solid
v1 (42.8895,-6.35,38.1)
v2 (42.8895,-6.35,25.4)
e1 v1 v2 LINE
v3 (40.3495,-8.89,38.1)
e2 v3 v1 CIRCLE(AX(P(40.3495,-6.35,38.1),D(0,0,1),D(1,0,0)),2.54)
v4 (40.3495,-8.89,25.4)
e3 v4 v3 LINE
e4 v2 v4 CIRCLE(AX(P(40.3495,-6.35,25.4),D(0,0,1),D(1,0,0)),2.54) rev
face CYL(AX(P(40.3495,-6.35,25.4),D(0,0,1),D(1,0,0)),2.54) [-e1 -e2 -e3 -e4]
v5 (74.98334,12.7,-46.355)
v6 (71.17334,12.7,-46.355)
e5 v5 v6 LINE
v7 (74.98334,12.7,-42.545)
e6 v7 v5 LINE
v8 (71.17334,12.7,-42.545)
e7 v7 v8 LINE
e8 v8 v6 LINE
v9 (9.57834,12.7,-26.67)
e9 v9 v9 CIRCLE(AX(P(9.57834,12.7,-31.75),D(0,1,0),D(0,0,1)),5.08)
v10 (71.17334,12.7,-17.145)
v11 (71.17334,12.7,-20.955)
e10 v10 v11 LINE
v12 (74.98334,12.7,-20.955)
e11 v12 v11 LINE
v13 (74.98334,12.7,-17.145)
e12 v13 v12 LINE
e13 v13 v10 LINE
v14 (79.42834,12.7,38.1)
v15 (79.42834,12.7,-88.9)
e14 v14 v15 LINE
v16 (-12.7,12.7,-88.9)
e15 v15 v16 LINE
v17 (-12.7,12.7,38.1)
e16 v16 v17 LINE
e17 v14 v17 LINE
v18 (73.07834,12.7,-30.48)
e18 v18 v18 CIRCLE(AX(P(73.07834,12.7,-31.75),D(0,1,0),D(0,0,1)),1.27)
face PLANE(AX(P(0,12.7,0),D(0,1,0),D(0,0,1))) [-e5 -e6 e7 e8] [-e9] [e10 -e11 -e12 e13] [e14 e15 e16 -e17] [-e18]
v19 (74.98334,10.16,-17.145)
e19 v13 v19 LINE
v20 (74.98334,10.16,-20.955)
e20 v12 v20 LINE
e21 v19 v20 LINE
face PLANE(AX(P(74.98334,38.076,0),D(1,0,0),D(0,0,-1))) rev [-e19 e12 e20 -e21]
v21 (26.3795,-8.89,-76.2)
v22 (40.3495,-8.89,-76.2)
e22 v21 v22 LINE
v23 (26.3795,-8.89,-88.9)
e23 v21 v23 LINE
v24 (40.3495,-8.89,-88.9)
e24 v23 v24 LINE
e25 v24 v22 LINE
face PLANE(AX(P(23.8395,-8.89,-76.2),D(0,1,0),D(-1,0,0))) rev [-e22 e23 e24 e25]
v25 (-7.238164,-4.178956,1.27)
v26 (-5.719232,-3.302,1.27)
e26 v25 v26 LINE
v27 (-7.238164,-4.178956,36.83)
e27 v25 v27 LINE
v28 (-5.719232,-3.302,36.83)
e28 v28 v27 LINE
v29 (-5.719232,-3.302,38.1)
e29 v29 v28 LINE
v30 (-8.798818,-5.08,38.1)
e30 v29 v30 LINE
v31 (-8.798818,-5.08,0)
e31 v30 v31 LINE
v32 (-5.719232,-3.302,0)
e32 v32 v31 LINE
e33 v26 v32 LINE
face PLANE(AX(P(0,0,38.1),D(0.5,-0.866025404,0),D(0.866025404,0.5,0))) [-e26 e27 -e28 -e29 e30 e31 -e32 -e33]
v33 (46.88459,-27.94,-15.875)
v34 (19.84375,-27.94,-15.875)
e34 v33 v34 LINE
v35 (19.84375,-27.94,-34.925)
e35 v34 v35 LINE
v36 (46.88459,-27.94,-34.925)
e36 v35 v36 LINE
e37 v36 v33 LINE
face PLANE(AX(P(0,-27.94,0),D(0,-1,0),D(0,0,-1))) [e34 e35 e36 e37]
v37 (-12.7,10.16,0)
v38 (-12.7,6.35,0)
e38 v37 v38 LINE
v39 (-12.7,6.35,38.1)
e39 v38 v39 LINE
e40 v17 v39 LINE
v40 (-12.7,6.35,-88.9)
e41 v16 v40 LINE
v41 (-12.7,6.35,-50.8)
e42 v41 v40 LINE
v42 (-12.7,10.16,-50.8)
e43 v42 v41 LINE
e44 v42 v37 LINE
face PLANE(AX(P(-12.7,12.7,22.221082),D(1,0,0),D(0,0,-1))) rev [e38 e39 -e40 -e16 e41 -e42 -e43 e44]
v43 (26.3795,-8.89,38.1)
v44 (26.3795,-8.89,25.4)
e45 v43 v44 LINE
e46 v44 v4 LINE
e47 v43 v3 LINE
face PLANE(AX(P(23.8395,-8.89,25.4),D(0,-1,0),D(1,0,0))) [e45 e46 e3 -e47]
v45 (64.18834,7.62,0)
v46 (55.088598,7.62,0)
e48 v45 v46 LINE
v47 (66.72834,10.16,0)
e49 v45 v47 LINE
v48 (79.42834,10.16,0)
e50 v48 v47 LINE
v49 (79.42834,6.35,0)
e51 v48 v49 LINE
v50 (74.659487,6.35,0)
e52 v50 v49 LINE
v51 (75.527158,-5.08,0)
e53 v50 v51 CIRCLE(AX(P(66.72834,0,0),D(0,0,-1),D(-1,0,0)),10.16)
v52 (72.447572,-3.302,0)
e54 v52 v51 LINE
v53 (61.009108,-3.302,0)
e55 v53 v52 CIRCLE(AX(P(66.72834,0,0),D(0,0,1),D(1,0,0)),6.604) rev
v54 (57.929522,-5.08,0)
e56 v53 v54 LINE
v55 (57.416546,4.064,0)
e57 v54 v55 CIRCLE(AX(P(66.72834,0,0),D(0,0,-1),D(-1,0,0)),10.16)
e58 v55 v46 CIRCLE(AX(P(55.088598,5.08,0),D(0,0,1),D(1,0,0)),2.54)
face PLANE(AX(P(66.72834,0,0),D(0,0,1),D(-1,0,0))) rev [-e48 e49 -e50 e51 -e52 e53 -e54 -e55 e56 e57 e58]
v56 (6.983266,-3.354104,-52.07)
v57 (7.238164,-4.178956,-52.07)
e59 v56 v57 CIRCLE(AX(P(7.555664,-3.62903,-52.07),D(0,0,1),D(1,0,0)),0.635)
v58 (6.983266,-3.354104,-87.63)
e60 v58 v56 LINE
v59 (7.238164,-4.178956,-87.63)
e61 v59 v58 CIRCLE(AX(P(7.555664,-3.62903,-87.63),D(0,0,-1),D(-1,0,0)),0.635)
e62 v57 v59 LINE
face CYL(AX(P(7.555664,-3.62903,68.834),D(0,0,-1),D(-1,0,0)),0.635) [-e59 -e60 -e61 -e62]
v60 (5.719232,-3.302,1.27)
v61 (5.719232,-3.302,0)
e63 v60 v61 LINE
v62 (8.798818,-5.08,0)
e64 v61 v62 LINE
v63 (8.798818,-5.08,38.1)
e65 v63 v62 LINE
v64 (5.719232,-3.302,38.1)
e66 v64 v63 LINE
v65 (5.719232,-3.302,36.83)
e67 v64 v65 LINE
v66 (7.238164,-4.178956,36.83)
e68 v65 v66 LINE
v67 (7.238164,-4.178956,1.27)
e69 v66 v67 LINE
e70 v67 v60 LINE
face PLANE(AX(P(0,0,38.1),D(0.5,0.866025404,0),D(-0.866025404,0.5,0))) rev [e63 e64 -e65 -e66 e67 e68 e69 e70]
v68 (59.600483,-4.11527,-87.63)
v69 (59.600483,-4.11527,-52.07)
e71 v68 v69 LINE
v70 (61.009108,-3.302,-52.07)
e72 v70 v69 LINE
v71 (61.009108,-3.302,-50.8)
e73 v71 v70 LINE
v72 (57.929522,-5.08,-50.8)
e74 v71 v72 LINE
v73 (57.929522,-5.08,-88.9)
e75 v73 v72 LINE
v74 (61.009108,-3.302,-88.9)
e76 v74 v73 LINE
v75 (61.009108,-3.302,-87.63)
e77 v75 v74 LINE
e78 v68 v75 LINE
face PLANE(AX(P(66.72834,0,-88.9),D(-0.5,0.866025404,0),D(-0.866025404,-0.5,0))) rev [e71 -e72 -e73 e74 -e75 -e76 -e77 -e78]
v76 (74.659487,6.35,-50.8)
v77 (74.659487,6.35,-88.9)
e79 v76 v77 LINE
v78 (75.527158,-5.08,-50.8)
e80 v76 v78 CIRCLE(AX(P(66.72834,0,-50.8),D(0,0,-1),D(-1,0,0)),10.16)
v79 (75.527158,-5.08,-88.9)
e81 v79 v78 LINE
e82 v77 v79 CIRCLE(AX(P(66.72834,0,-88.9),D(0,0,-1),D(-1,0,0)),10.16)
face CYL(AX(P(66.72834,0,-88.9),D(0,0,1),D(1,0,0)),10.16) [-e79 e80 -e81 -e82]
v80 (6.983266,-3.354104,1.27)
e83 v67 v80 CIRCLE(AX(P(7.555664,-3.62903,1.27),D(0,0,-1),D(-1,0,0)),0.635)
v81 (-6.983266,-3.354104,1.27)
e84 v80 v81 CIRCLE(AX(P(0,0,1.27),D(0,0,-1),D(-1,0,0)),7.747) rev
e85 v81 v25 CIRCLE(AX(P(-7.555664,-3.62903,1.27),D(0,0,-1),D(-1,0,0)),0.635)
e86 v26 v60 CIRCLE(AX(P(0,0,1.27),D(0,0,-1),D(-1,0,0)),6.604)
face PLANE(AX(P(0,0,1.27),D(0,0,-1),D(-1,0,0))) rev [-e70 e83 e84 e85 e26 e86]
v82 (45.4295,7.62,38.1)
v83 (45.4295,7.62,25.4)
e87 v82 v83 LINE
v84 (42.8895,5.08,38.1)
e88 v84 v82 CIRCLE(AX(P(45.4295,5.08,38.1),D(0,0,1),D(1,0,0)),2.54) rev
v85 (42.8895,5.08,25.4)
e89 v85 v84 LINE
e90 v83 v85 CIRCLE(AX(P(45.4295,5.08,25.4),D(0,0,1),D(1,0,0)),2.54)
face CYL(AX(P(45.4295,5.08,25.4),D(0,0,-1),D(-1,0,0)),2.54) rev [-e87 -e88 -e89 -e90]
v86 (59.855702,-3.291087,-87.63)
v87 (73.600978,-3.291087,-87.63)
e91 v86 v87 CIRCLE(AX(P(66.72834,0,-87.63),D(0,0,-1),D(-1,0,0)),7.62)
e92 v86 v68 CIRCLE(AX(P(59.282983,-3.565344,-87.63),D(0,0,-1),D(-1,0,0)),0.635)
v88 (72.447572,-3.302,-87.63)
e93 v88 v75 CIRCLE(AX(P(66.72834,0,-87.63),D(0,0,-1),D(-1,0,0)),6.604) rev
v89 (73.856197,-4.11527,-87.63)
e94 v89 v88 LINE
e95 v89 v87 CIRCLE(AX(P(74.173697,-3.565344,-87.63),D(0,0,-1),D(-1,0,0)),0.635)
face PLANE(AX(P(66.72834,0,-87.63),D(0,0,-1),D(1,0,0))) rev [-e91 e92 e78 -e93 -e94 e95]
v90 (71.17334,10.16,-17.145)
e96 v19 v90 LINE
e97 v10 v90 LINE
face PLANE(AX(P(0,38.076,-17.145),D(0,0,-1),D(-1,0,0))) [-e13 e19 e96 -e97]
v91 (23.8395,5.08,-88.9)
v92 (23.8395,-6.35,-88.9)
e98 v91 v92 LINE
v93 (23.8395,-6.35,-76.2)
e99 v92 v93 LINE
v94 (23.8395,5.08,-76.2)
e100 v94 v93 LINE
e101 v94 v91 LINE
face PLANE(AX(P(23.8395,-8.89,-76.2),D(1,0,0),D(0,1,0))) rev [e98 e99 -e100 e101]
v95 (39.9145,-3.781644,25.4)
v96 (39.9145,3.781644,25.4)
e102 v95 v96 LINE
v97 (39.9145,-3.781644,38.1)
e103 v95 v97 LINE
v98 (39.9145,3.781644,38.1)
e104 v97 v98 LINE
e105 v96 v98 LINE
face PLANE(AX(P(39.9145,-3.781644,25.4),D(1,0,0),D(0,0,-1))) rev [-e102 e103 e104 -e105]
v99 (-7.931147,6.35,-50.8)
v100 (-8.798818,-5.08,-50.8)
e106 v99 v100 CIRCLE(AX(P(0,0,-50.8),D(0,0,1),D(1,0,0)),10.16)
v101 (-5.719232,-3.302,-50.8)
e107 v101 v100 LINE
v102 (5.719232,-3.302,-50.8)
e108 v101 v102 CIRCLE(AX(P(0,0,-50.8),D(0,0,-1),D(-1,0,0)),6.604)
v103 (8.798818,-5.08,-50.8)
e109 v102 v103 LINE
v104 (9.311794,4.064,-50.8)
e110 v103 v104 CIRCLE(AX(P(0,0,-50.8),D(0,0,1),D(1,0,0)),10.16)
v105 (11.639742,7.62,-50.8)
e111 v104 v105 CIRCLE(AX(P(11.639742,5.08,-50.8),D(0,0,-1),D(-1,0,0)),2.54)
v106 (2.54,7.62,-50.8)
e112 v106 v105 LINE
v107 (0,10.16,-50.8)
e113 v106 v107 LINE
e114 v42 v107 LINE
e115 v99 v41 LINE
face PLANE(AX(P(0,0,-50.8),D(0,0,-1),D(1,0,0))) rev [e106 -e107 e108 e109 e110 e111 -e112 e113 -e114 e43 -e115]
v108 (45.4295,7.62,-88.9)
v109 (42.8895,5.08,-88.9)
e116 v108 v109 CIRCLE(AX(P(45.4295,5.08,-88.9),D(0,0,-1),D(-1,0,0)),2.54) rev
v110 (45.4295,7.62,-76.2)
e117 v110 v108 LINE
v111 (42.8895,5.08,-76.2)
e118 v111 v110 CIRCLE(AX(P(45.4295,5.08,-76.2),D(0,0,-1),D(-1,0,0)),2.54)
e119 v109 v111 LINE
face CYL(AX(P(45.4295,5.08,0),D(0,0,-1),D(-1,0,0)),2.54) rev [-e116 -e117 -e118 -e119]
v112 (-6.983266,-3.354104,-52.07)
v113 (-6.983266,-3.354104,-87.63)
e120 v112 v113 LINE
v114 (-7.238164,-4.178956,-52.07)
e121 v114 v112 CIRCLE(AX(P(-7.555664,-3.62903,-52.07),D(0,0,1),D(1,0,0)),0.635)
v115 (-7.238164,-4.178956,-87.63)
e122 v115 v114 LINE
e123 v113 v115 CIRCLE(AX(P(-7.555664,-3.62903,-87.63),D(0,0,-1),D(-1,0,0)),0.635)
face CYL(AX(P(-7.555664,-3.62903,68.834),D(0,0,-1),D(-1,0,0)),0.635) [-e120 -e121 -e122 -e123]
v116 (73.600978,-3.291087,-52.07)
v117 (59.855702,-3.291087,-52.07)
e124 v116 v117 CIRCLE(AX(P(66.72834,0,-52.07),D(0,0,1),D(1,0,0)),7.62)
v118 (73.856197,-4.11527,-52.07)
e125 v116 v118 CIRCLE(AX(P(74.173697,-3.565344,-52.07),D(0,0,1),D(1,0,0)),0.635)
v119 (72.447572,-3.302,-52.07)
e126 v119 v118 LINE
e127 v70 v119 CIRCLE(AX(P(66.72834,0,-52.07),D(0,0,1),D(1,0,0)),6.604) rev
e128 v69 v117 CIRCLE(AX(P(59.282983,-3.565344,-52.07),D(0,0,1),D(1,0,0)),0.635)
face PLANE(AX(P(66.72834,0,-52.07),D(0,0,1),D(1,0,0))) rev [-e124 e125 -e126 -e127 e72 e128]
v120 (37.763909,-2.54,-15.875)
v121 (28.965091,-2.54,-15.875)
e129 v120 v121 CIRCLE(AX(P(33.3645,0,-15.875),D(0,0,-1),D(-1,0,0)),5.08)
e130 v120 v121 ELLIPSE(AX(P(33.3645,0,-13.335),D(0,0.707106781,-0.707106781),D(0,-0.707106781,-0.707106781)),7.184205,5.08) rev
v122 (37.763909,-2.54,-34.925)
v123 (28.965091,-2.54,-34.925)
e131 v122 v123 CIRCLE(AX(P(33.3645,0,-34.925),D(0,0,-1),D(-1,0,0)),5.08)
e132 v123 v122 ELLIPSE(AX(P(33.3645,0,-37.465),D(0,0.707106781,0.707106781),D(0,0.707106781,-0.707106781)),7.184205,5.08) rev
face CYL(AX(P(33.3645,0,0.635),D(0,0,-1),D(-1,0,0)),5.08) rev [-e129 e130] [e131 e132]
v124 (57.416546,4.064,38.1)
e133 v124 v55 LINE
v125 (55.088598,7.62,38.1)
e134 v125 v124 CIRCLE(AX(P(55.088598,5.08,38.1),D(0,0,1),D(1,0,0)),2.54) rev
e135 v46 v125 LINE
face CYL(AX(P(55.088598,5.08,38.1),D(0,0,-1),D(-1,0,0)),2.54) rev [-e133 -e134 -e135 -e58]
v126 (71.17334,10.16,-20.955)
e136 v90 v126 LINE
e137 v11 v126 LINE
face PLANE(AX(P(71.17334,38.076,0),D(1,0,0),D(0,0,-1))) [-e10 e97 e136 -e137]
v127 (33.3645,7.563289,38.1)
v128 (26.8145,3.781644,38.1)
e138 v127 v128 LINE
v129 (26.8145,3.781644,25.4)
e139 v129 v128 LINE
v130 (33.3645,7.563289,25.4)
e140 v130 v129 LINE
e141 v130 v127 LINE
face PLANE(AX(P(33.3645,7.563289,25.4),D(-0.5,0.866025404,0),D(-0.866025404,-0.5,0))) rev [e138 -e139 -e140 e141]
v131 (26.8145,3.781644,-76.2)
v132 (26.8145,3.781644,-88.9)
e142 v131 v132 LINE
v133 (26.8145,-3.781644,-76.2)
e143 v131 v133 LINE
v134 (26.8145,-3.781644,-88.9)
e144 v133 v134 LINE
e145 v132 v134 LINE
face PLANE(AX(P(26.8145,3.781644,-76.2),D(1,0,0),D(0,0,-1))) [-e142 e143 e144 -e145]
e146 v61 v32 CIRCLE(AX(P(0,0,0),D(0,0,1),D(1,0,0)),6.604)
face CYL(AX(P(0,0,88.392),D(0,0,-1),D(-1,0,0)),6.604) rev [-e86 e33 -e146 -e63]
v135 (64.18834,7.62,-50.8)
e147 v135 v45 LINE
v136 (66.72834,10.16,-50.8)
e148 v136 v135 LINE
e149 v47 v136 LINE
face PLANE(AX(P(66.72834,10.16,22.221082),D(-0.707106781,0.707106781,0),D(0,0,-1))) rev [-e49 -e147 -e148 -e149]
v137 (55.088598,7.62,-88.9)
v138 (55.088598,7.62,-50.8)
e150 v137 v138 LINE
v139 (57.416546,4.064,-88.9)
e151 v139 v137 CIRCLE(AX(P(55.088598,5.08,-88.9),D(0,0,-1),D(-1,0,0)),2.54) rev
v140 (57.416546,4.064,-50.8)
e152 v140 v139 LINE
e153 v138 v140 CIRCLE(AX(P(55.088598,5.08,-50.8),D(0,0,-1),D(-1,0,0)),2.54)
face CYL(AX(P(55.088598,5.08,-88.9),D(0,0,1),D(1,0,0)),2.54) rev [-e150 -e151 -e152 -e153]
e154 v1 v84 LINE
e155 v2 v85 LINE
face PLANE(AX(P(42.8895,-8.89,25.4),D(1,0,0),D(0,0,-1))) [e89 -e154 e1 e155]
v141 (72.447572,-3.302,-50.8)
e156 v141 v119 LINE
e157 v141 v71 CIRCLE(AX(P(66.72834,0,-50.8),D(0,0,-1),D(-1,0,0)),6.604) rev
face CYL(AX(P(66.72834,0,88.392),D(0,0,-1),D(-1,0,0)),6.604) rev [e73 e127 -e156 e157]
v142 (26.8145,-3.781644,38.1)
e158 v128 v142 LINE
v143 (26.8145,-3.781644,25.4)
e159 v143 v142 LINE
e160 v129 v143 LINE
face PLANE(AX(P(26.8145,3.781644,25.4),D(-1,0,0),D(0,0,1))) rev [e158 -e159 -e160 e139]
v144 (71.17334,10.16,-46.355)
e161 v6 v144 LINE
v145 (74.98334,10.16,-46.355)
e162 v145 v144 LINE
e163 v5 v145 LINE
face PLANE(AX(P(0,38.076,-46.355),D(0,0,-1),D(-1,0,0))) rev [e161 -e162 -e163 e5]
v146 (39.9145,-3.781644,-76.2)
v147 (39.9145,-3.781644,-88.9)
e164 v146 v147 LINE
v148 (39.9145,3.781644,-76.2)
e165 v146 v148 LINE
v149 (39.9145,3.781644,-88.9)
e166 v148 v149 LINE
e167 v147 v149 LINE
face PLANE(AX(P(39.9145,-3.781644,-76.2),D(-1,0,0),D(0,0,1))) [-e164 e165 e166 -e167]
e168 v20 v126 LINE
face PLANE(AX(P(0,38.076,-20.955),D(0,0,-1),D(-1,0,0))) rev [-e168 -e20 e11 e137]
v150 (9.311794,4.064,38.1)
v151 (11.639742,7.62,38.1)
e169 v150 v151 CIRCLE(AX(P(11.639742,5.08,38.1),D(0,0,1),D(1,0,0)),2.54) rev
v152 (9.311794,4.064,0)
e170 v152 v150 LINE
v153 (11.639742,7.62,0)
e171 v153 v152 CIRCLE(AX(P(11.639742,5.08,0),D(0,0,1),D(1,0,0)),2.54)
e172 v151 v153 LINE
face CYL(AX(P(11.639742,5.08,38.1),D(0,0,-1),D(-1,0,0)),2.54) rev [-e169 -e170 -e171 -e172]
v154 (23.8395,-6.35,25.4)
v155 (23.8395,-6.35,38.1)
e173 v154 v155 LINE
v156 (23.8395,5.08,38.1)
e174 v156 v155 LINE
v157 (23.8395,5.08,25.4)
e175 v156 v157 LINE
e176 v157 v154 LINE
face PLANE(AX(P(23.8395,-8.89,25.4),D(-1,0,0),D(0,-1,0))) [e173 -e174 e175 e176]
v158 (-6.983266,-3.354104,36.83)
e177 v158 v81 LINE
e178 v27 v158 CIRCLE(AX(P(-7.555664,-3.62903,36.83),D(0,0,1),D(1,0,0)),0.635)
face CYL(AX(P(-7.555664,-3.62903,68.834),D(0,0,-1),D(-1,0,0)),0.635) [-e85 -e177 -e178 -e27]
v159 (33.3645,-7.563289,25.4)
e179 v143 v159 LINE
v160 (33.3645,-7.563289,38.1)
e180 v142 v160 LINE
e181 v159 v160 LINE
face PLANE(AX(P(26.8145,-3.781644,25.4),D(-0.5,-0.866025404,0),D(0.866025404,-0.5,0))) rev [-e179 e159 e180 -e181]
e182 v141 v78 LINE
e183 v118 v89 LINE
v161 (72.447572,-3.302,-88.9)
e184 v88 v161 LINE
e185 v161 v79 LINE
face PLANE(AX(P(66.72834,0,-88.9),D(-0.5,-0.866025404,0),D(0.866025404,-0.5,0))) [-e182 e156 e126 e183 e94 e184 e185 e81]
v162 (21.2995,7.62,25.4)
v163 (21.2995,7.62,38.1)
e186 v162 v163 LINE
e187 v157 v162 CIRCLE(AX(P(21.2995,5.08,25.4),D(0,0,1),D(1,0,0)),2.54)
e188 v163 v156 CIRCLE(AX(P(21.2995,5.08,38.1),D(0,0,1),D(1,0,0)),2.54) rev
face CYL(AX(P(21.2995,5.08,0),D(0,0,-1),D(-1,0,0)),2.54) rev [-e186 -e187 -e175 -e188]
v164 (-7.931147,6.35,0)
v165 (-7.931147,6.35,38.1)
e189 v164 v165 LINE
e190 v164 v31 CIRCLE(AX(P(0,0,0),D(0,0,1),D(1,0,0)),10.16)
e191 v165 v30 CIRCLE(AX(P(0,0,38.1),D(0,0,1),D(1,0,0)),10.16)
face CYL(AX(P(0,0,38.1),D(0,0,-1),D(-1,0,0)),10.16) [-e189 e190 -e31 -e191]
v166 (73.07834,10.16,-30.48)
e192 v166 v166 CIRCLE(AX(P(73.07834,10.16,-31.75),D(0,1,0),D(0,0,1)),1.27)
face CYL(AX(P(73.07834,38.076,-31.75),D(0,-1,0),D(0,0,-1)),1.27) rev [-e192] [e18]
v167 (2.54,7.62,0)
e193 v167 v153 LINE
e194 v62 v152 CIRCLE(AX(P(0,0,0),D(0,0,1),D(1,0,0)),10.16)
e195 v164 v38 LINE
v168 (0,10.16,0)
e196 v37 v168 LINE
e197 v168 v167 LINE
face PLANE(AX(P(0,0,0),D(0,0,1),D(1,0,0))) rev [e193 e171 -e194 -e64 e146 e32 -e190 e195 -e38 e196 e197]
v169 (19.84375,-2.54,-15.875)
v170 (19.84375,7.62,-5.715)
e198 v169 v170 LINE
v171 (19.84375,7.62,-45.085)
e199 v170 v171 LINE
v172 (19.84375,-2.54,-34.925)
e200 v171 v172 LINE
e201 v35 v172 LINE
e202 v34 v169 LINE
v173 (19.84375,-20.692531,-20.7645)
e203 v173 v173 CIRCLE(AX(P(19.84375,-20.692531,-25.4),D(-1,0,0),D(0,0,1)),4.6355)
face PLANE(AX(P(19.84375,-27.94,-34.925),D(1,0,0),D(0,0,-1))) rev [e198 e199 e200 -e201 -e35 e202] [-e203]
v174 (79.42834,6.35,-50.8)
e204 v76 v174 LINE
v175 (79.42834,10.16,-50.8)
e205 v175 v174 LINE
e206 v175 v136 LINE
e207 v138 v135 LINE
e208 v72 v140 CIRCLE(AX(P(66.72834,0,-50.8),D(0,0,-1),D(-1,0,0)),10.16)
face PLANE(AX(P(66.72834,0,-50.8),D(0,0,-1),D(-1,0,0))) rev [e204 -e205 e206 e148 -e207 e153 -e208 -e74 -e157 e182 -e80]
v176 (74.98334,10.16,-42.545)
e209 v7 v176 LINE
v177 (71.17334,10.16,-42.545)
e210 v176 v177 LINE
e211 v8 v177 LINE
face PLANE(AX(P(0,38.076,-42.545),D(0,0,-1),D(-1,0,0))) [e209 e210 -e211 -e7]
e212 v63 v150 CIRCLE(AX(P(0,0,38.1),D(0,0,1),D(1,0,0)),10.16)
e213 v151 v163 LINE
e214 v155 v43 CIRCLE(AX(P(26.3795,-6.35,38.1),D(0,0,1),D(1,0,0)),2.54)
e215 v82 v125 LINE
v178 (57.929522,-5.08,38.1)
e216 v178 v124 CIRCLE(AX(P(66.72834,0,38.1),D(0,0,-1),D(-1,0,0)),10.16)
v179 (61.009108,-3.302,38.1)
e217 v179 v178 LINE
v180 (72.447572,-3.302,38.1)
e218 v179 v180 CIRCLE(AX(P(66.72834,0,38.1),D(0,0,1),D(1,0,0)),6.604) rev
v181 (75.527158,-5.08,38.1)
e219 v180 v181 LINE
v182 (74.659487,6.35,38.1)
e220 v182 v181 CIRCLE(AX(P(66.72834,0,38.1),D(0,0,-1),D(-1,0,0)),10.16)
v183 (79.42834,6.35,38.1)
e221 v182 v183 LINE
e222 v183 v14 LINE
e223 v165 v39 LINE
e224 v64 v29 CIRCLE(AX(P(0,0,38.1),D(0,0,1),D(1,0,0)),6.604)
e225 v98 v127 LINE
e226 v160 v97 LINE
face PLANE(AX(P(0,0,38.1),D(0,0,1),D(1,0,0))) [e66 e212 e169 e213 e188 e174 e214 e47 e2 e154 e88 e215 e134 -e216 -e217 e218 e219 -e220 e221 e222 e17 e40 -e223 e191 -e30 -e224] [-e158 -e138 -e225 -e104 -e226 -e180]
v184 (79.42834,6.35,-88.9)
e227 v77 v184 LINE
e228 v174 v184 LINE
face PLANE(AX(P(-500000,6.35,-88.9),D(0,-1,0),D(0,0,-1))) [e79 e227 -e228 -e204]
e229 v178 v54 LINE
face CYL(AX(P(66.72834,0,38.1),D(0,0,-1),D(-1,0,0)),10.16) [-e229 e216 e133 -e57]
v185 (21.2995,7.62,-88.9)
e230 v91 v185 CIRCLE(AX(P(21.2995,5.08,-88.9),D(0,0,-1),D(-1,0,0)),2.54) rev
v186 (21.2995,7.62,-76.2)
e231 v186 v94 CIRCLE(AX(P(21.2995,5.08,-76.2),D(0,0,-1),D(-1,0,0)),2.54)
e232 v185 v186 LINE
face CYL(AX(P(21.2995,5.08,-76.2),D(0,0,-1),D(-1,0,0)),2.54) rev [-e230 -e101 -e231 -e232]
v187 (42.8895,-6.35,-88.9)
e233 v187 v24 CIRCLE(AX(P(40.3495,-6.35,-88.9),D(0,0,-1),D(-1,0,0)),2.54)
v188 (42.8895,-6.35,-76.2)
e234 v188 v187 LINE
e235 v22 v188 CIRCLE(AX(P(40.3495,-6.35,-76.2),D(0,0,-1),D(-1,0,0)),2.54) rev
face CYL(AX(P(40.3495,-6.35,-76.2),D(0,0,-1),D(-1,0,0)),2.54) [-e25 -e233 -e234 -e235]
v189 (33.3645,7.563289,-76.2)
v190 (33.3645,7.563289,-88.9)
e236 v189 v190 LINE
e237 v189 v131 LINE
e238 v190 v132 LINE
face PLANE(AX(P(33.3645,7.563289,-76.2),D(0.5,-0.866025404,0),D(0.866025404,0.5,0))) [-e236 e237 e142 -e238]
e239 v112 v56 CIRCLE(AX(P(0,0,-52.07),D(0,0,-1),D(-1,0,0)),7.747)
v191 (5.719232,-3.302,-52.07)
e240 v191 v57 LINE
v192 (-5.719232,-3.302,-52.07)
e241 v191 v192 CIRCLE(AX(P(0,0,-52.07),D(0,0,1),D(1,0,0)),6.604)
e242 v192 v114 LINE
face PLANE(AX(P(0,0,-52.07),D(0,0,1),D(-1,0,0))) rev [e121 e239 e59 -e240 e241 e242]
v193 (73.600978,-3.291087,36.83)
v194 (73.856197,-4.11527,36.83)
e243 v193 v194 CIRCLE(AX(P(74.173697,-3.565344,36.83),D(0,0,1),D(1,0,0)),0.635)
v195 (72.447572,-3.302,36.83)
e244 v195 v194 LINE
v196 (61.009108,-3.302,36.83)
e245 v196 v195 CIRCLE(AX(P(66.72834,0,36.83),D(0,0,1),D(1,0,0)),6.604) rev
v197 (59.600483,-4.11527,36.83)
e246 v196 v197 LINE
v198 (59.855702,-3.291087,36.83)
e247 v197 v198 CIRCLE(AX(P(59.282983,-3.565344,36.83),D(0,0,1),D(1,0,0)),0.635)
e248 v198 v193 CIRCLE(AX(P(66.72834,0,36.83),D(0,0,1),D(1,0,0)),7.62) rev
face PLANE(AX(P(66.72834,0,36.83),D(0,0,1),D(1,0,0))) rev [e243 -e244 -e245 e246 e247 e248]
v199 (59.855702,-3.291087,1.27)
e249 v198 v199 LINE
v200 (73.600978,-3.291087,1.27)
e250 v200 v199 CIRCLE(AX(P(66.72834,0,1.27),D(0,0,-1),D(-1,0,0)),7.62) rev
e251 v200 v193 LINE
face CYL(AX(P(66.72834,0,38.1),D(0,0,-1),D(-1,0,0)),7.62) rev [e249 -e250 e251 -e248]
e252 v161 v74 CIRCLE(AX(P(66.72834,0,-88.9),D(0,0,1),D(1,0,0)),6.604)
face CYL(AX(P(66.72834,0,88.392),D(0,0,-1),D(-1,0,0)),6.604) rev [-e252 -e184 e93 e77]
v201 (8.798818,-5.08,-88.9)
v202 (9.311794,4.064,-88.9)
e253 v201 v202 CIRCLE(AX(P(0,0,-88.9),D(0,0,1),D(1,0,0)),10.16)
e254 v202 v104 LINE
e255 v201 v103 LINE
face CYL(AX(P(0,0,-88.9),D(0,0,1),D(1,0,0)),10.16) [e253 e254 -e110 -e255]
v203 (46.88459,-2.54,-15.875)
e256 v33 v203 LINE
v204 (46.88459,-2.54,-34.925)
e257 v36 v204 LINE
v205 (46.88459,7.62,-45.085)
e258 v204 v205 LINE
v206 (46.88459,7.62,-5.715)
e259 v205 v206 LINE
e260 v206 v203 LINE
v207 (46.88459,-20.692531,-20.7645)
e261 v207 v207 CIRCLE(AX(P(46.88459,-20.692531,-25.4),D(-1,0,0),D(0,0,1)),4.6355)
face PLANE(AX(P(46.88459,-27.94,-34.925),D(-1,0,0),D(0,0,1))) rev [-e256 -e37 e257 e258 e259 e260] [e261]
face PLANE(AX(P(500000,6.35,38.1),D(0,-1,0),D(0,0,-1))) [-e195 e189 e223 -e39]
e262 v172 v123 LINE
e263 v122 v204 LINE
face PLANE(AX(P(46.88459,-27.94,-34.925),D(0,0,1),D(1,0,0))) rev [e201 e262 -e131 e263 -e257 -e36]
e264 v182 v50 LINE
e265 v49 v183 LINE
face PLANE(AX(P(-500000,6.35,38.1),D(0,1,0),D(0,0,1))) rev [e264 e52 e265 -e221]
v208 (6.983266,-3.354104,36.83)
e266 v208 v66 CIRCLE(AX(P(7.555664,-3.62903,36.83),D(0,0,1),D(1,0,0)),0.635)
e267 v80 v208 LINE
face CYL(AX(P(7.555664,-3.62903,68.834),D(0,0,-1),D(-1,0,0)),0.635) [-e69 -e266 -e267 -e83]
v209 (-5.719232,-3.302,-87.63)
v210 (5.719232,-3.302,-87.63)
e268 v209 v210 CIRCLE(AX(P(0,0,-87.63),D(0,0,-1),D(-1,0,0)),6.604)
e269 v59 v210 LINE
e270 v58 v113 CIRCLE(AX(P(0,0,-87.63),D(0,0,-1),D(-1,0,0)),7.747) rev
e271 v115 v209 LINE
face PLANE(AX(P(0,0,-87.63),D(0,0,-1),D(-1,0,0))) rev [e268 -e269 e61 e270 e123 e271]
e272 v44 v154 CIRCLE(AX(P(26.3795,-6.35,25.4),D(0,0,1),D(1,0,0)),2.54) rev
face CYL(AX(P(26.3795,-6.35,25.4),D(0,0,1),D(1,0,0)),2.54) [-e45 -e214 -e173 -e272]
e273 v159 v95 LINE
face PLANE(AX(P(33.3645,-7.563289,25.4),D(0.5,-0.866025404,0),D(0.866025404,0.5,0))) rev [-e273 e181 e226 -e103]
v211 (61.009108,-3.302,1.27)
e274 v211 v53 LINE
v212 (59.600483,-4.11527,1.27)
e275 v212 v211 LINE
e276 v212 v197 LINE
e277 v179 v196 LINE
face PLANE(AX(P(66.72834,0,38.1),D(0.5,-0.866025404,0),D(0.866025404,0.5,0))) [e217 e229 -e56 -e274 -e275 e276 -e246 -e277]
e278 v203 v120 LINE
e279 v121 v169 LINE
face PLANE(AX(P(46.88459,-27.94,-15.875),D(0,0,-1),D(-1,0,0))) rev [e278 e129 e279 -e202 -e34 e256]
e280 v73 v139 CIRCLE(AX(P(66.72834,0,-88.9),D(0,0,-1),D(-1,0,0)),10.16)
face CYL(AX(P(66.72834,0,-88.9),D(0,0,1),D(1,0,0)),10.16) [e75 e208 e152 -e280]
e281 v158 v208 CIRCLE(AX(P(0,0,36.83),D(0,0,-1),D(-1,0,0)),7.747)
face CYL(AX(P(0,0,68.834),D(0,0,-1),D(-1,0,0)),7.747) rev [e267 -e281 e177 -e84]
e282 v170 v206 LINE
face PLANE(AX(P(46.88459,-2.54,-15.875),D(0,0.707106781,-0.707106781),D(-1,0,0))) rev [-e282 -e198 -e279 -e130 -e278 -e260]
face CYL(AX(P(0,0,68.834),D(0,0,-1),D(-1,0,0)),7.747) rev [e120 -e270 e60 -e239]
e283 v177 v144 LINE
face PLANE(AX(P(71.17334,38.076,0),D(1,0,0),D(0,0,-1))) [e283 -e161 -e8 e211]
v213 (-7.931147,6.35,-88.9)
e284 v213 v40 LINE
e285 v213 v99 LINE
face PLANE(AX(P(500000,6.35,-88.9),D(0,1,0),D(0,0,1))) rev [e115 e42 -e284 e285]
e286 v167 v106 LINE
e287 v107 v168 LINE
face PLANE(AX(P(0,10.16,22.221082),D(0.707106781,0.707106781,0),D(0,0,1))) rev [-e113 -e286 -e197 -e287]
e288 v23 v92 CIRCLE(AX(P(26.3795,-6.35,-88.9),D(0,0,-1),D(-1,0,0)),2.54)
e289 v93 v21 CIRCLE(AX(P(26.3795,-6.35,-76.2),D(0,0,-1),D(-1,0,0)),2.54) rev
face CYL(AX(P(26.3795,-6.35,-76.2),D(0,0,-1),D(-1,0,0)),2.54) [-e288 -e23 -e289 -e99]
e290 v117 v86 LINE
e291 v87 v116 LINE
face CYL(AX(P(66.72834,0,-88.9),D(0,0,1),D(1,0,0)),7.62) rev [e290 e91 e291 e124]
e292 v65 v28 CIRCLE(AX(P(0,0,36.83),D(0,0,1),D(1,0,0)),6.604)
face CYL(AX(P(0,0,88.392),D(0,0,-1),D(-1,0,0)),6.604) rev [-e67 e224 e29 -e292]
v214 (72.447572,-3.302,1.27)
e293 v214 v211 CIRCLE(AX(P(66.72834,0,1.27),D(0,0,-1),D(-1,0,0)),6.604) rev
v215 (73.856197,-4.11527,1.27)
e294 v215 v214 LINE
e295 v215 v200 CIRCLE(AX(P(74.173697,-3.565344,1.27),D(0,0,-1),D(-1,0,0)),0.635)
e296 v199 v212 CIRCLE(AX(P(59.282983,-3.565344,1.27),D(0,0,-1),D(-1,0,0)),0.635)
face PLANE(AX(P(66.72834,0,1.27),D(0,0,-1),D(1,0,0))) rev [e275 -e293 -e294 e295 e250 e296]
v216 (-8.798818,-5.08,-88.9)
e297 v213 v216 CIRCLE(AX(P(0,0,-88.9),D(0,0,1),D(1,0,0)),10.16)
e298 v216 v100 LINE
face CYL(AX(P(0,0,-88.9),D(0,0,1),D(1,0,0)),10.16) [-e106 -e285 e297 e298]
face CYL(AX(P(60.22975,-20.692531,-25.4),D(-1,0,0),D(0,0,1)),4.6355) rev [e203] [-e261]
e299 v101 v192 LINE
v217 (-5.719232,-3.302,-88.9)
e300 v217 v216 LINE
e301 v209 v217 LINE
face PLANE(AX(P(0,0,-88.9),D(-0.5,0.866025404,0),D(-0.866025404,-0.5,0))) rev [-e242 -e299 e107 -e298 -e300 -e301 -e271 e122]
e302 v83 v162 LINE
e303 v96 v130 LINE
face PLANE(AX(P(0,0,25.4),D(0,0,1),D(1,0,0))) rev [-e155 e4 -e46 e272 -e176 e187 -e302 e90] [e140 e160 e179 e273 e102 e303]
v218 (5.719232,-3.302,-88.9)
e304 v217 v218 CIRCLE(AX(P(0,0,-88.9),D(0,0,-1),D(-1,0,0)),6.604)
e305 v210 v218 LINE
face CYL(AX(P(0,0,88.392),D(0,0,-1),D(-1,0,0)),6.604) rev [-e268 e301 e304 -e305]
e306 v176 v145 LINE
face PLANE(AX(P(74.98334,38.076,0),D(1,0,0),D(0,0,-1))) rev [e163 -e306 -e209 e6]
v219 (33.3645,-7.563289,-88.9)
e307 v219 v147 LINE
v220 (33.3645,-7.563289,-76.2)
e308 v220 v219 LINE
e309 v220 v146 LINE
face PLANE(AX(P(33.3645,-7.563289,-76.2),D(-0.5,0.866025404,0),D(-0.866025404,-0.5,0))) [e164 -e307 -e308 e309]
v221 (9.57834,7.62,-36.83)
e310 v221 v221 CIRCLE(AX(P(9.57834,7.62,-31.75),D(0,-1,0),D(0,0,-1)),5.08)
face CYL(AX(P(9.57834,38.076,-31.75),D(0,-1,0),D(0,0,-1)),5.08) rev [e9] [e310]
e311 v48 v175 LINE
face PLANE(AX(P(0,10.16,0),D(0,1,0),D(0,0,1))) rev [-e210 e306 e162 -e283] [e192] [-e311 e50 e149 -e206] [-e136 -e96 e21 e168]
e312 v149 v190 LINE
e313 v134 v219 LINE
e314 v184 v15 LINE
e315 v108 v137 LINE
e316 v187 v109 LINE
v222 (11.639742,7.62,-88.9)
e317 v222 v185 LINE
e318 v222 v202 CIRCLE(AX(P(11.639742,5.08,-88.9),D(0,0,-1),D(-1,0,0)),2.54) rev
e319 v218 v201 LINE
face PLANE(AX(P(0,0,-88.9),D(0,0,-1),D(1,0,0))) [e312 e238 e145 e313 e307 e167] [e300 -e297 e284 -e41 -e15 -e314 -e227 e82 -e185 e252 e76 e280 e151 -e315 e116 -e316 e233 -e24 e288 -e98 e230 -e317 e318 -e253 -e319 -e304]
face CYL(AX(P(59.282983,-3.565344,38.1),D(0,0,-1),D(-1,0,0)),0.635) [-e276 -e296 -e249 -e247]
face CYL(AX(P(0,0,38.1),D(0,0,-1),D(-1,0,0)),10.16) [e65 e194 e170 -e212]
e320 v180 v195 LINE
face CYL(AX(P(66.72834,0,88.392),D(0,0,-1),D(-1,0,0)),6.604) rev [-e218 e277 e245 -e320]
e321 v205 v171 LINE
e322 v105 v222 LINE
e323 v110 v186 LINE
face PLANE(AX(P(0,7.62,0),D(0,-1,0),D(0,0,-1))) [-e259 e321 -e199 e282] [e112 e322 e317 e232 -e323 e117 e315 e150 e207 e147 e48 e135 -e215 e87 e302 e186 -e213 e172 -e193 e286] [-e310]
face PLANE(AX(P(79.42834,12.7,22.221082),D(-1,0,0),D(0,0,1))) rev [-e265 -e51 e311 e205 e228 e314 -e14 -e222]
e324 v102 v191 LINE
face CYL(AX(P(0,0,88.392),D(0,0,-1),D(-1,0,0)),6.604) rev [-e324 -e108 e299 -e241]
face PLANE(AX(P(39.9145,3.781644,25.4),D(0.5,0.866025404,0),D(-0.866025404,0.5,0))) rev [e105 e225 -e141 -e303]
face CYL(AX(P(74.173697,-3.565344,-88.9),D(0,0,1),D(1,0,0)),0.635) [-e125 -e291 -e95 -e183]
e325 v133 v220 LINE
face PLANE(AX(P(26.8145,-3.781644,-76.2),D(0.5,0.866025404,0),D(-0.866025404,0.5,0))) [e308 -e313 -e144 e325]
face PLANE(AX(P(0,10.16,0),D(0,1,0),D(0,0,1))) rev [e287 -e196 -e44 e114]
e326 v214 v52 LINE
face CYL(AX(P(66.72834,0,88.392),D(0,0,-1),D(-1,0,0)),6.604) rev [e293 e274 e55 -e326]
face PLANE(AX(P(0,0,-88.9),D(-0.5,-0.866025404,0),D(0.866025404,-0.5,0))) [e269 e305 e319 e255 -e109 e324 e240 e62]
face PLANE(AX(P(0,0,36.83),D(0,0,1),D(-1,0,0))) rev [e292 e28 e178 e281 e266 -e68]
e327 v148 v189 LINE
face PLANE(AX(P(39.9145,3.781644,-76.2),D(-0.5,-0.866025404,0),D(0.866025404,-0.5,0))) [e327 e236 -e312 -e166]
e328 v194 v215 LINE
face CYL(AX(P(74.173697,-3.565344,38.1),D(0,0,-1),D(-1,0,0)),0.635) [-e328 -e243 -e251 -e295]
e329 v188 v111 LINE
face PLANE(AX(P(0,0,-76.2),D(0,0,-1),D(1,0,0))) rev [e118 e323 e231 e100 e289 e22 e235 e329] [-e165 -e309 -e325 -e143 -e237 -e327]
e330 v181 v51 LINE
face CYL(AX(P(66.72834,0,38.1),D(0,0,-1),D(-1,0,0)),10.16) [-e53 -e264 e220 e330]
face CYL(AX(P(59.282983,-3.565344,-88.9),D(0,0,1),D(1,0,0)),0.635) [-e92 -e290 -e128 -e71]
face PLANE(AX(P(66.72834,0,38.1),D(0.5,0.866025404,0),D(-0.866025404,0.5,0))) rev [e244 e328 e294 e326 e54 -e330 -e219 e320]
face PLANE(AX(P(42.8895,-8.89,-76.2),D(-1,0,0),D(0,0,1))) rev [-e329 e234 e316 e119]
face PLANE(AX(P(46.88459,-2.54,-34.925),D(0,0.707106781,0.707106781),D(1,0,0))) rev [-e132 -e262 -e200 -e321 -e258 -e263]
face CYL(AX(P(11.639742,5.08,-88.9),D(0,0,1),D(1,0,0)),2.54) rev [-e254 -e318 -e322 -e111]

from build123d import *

# Parameters (mm, degrees)
BOSS_EXTRUDE1_DEPTH     = 38.1
BOSS_EXTRUDE2_DEPTH     = 2.54
MIRROR3_COPY_1_DEPTH    = 38.1
BOSS_EXTRUDE3_DEPTH     = 2.54
CHAMFER1_SIZE           = 2.54
FILLET1_R               = 2.54
CUT_EXTRUDE1_DEPTH      = 15.878917544
BOSS_EXTRUDE4_DEPTH     = 15.878917544
SKETCH7_R               = 7.747000000000001
SKETCH7_R_2             = 7.62
CUT_EXTRUDE2_DEPTH      = 157.734
SKETCH8_R               = 7.7470000000000026
BOSS_EXTRUDE6_DEPTH     = 1.27
MIRROR5_COPY_1_SKETCH_R = 7.7470000000000026
MIRROR5_COPY_1_DEPTH    = 1.27
SKETCH10_R              = 6.604
CUT_EXTRUDE3_DEPTH      = 177.29200000000014
MIRROR8_COPY_1_SKETCH_R = 7.7470000000000026
MIRROR8_COPY_1_DEPTH    = 1.27
MIRROR8_COPY_2_SKETCH_R = 7.7470000000000026
MIRROR8_COPY_2_DEPTH    = 1.27
MIRROR8_COPY_3_SKETCH_R = 7.7470000000000026
MIRROR8_COPY_3_DEPTH    = 1.27
FILLET3_R               = 0.635
BOSS_EXTRUDE7_REACH     = 130.655
MIRROR12_COPY_1_REACH   = 130.655
SKETCH12_R              = 5.080000000000001
SKETCH12_W              = 3.8100000000000023
SKETCH12_H              = 3.8100000000000023
SKETCH12_R_2            = 1.2699999999999905
CUT_EXTRUDE4_DEPTH      = 30.45600000000001
BOSS_EXTRUDE9_DEPTH     = 12.7
FILLET5_R               = 2.54
FILLET5_OF_MIRROR14_R   = 2.54
SKETCH15_W              = 27.040839999995164
SKETCH15_H              = 19.05
BOSS_EXTRUDE10_DEPTH    = 35.559999999999995
SKETCH16_R              = 5.080000000000001
CUT_EXTRUDE5_DEPTH      = 35.559999999999995
SKETCH17_R              = 4.6354999999999995
CUT_EXTRUDE6_DEPTH      = 40.385999999999996
CHAMFER2_SIZE           = 10.16


with BuildPart() as part:
    # Sketch1 → Boss-Extrude1 (new body)
    with BuildSketch(Plane.XY):
        with BuildLine():
            Line((-8.79881810244989, -5.080000000000015), (-6.599113576837417, -3.810000000000011))
            ThreePointArc((-6.599113576837502, -3.8099999999998597), (-1.9722011236811299, 7.360354796322719), (7.619999999999998, 0))
            ThreePointArc((7.619999999999998, -1.87e-15), (7.36035479632272, -1.972201123681129), (6.5991135768375, -3.809999999999862))
            Line((6.599113576837415, -3.810000000000005), (8.798818102449891, -5.080000000000009))
            ThreePointArc((8.79881810244989, -5.0800000000000125), (9.813806395096933, -2.629601498241619), (10.16, -2.49e-15))
            ThreePointArc((10.16, 0), (-2.629601498241616, 9.813806395096933), (-8.798818102449891, -5.080000000000009))
        make_face()
    boss_extrude1 = extrude(amount=BOSS_EXTRUDE1_DEPTH)

    # Sketch2 → Boss-Extrude2 (add)
    with BuildSketch(Plane(origin=(0, 10.159999999999998, 0), x_dir=(1, 0, 0), z_dir=(0, 1, 0))):
        Polygon((0, -22.221082455530443), (66.72834, -22.22108245553045), (66.72834, 104.77891754446955), (2.72e-15, 104.77891754446955), align=None)
    extrude(amount=-BOSS_EXTRUDE2_DEPTH)

    # Mirror2: Boss-Extrude1 across plane
    add(boss_extrude1.mirror(Plane.XY.offset(-25.4)))

    # Mirror3: Boss-Extrude1 across plane
    add(boss_extrude1.mirror(Plane(origin=(33.36417, 0, 0), x_dir=(0, 0, 1), z_dir=(1, 0, 0))))

    # Mirror3 copy 1 sketch → Mirror3 copy 1 (add)
    with BuildSketch(Plane(origin=(66.72834, 0, -50.8), x_dir=(-1, 0, 0), z_dir=(0, 0, -1))):
        with BuildLine():
            Line((-8.79881810244989, -5.080000000000015), (-6.599113576837417, -3.810000000000011))
            ThreePointArc((-6.599113576837502, -3.8099999999998597), (-1.9722011236811299, 7.360354796322719), (7.619999999999998, 0))
            ThreePointArc((7.619999999999998, -1.87e-15), (7.36035479632272, -1.972201123681129), (6.5991135768375, -3.809999999999862))
            Line((6.599113576837415, -3.810000000000005), (8.798818102449891, -5.080000000000009))
            ThreePointArc((8.79881810244989, -5.0800000000000125), (9.813806395096933, -2.629601498241619), (10.16, -2.49e-15))
            ThreePointArc((10.16, 0), (-2.629601498241616, 9.813806395096933), (-8.798818102449891, -5.080000000000009))
        make_face()
    extrude(amount=MIRROR3_COPY_1_DEPTH)

    # Sketch4 → Boss-Extrude3 (add)
    with BuildSketch(Plane(origin=(0, 10.159999999999998, 0), x_dir=(1, 0, 0), z_dir=(0, 1, 0))):
        Polygon((79.42834, -22.221082455530443), (-12.700000000000003, -22.221082455530453), (-12.700000000000003, 104.77891754446954), (79.42834, 104.77891754446955), align=None)
    extrude(amount=BOSS_EXTRUDE3_DEPTH)

    # Chamfer1
    # the kernel refuses this chamfer: 2.54 mm, written as the material it takes off along each edge
    with BuildSketch(Plane(origin=(66.72834, 7.619999999999998, 0), x_dir=(0.02749587661058456, 0.9996219169112968, 0), z_dir=(0, 0, -1))) as chamfer1_piece_1_section:
        Polygon((CHAMFER1_SIZE * 0.999621916911, -CHAMFER1_SIZE * 0.0274958766106), (-CHAMFER1_SIZE * 0.0274958766106, -CHAMFER1_SIZE * 0.999621916911), (0, 0), align=None)
    chamfer1_piece_1 = extrude(amount=50.8, mode=Mode.PRIVATE)
    chamfer1_piece_1 = split(chamfer1_piece_1, bisect_by=Plane(origin=(65.88911344802735, 10.159999999999998, -25.4), z_dir=(0, -1, 0)), keep=Keep.TOP, mode=Mode.PRIVATE)
    add(chamfer1_piece_1, mode=Mode.SUBTRACT)
    with BuildSketch(Plane(origin=(1.56e-15, 7.619999999999998, -50.8), x_dir=(0.9996219169112968, -0.027495876610586254, 0), z_dir=(-2e-17, 0, 1))) as chamfer1_piece_2_section:
        Polygon((CHAMFER1_SIZE * 0.999621916911, CHAMFER1_SIZE * 0.0274958766106), (-CHAMFER1_SIZE * 0.0274958766106, CHAMFER1_SIZE * 0.999621916911), (0, 0), align=None)
    chamfer1_piece_2 = extrude(amount=50.8, mode=Mode.PRIVATE)
    chamfer1_piece_2 = split(chamfer1_piece_2, bisect_by=Plane(origin=(0.8392265519726436, 10.159999999999998, -25.400000000000006), z_dir=(0, -1, 0)), keep=Keep.TOP, mode=Mode.PRIVATE)
    add(chamfer1_piece_2, mode=Mode.SUBTRACT)

    # Fillet1
    fillet1_edges = [part.edges().sort_by_distance(p)[0] for p in [
        (6.7202083301040485, 7.619999999999998, 11.110541227765221),
        (6.7202083301040485, 7.619999999999998, -69.85),
        (60.00813166989596, 7.619999999999998, -69.85),
        (60.00813166989596, 7.619999999999998, 11.110541227765225),
    ]]
    fillet(fillet1_edges, radius=FILLET1_R)

    # Sketch5 → Cut-Extrude1 (cut)
    with BuildSketch(Plane(origin=(0, 0, -104.77891754446955), x_dir=(-1, 0, 0), z_dir=(0, 0, -1))):
        Polygon((-79.42834, 12.7), (-79.42834, 10.159999999999998), (-66.72834, 10.159999999999998), (-66.72834, 7.619999999999998), (-2.72e-15, 7.619999999999998), (-2.72e-15, 10.159999999999998), (12.700000000000003, 10.159999999999998), (12.700000000000003, 12.7), align=None)
    extrude(amount=-CUT_EXTRUDE1_DEPTH, mode=Mode.SUBTRACT)

    # Sketch6 → Boss-Extrude4 (add)
    with BuildSketch(Plane.XY.offset(22.221082455530443)):
        with BuildLine():
            Line((-12.700000000000001, 10.159999999999998), (-12.700000000000001, 12.7))
            Line((-12.700000000000001, 12.7), (79.42834, 12.7))
            Line((79.42834, 12.7), (79.42834, 10.159999999999998))
            Line((79.42834, 10.159999999999998), (66.72834, 10.159999999999998))
            Line((66.72834, 10.159999999999998), (57.416546187849725, 4.063999999999999))
            ThreePointArc((57.416546187849725, 4.063999999999999), (57.213714202208706, 6.471215296063113), (55.08859773481217, 7.619999999999998))
            Line((55.08859773481217, 7.619999999999998), (11.639742265187834, 7.619999999999998))
            ThreePointArc((11.639742265187834, 7.619999999999998), (9.514625797791286, 6.471215296063118), (9.311793812150269, 4.063999999999998))
            Line((9.311793812150269, 4.063999999999998), (-3.316e-14, 10.159999999999998))
            Line((-3.316e-14, 10.159999999999998), (-12.700000000000001, 10.159999999999998))
        make_face()
    extrude(amount=BOSS_EXTRUDE4_DEPTH)

    # Sketch7 → Cut-Extrude2 (cut)
    with BuildSketch(Plane(origin=(0, 0, -88.9), x_dir=(-1, 0, 0), z_dir=(0, 0, -1))):
        Circle(SKETCH7_R)
        Circle(SKETCH7_R_2, mode=Mode.SUBTRACT)
    extrude(amount=-CUT_EXTRUDE2_DEPTH, mode=Mode.SUBTRACT)

    # Sketch8 → Boss-Extrude6 (add)
    with BuildSketch(Plane(origin=(0, 0, -88.9), x_dir=(-1, 0, 0), z_dir=(0, 0, -1))):
        Circle(SKETCH8_R)
    boss_extrude6 = extrude(amount=-BOSS_EXTRUDE6_DEPTH)

    # Mirror4: Boss-Extrude6 across plane
    add(boss_extrude6.mirror(Plane.XY.offset(-69.85)))

    # Mirror5: Boss-Extrude6 across plane
    add(boss_extrude6.mirror(Plane.XY.offset(-25.4)))

    # Mirror5 copy 1 sketch → Mirror5 copy 1 (add)
    with BuildSketch(Plane(origin=(0, 0, -1.421e-14), x_dir=(-1, 0, 0), z_dir=(0, 0, -1))):
        Circle(MIRROR5_COPY_1_SKETCH_R)
    extrude(amount=-MIRROR5_COPY_1_DEPTH)

    # Sketch10 → Cut-Extrude3 (cut)
    with BuildSketch(Plane(origin=(0, 0, -88.9), x_dir=(-1, 0, 0), z_dir=(0, 0, -1))):
        with BuildLine():
            ThreePointArc((-6.709098803118043, -3.8735000000000084), (-6.7e-16, -7.747000000000002), (6.709098803118042, -3.87350000000001))
            Line((6.709098803118041, -3.8735000000000115), (5.7192317665924275, -3.3020000000000076))
            ThreePointArc((5.719231766592428, -3.302000000000008), (-1.21e-15, -6.604), (-5.719231766592429, -3.302000000000006))
            Line((-5.719231766592428, -3.3020000000000063), (-6.709098803118043, -3.8735000000000084))
        make_face()
        Circle(SKETCH10_R)
    cut_extrude3 = extrude(amount=-CUT_EXTRUDE3_DEPTH, mode=Mode.SUBTRACT)

    # Mirror8: Boss-Extrude6 across plane
    add(boss_extrude6.mirror(Plane.ZY.offset(-33.36417)))

    # Mirror8 copy 1 sketch → Mirror8 copy 1 (add)
    with BuildSketch(Plane(origin=(66.72834, 0, -50.79999999999998), x_dir=(1, 0, 0), z_dir=(0, 0, 1))):
        Circle(MIRROR8_COPY_1_SKETCH_R)
    extrude(amount=-MIRROR8_COPY_1_DEPTH)

    # Mirror8 copy 2 sketch → Mirror8 copy 2 (add)
    with BuildSketch(Plane(origin=(66.72834, 0, 38.10000000000001), x_dir=(1, 0, 0), z_dir=(0, 0, 1))):
        Circle(MIRROR8_COPY_2_SKETCH_R)
    extrude(amount=-MIRROR8_COPY_2_DEPTH)

    # Mirror8 copy 3 sketch → Mirror8 copy 3 (add)
    with BuildSketch(Plane(origin=(66.72834, 0, -1.421e-14), x_dir=(1, 0, 0), z_dir=(0, 0, -1))):
        Circle(MIRROR8_COPY_3_SKETCH_R)
    extrude(amount=-MIRROR8_COPY_3_DEPTH)

    # Mirror9: Cut-Extrude3 across plane
    add(cut_extrude3.mirror(Plane.ZY.offset(-33.36417)), mode=Mode.SUBTRACT)

    # Fillet3
    fillet3_edges = [part.edges().sort_by_distance(p)[0] for p in [
        (6.709098803118043, -3.8735000000000075, -69.85),
        (-6.709098803118041, -3.8735000000000115, -69.85),
        (-6.709098803118041, -3.8735000000000115, 19.049999999999997),
        (6.709098803118043, -3.8735000000000075, 19.049999999999997),
        (73.32745357683746, -3.8099999999999348, 19.049999999999994),
        (60.12922642316254, -3.8099999999999334, 19.049999999999994),
        (73.32745357683746, -3.8099999999999348, -69.85),
        (60.12922642316254, -3.8099999999999334, -69.85),
    ]]
    fillet(fillet3_edges, radius=FILLET3_R)

    # Sketch11 → Boss-Extrude7 (add, up to next)
    with BuildSketch(Plane.ZY.offset(12.700000000000003), mode=Mode.PRIVATE) as boss_extrude7_sk1:
        Polygon((38.099999999999994, 12.7), (0, 12.7), (7.8e-16, 6.349999999999994), (38.099999999999994, 6.349999999999999), align=None)
    boss_extrude7_tool1 = extrude(boss_extrude7_sk1.sketch, amount=-BOSS_EXTRUDE7_REACH, mode=Mode.PRIVATE) - part.part
    boss_extrude7 = boss_extrude7_tool1.solids().sort_by_distance((-12.7, 9.525, 19.05))[0]
    add(boss_extrude7)

    # Mirror11: Boss-Extrude7 across plane
    add(boss_extrude7.mirror(Plane.XY.offset(-25.4)))

    # Mirror12: Boss-Extrude7 across plane
    add(boss_extrude7.mirror(Plane.ZY.offset(-33.36417)))

    # Mirror12 copy 1 sketch → Mirror12 copy 1 (add, up to next)
    with BuildSketch(Plane(origin=(79.42834, 0, -50.8), x_dir=(0, 0, -1), z_dir=(1, 0, 0)), mode=Mode.PRIVATE) as mirror12_copy_1_sk1:
        Polygon((38.099999999999994, 12.7), (0, 12.7), (7.8e-16, 6.349999999999994), (38.099999999999994, 6.349999999999999), align=None)
    mirror12_copy_1_tool1 = extrude(mirror12_copy_1_sk1.sketch, amount=-MIRROR12_COPY_1_REACH, mode=Mode.PRIVATE) - part.part
    add(mirror12_copy_1_tool1.solids().sort_by_distance((79.42834, 9.525, -69.85))[0])

    # Sketch12 → Cut-Extrude4 (cut)
    with BuildSketch(Plane.XZ.offset(-7.619999999999998)):
        with Locations(Location((9.578340000000019, -31.750000000000007, 0), (0, 0, 270))):
            Circle(SKETCH12_R)
        with Locations((73.07834000000003, -44.44999999999999)):
            Rectangle(SKETCH12_W, SKETCH12_H)
        with Locations(Location((73.07834000000001, -31.750000000000007, 0), (0, 0, 90))):
            Circle(SKETCH12_R_2)
        with Locations((73.07834000000003, -19.049999999999997)):
            Rectangle(SKETCH12_W, SKETCH12_H)
    extrude(amount=-CUT_EXTRUDE4_DEPTH, mode=Mode.SUBTRACT)

    # Sketch14 → Boss-Extrude9 (add)
    with BuildSketch(Plane.XY.offset(38.1)):
        Polygon((23.839499946002224, -8.890000000000004), (23.839499946002228, 7.62), (42.889499946002225, 7.62), (42.889499946002225, -8.890000000000002), align=None)
        Polygon((33.36449994600227, 7.563288526382876), (26.814499946002268, 3.781644263190828), (26.814499946002268, -3.781644263193271), (33.36449994600227, -7.56328852638532), (39.914499946002266, -3.781644263193273), (39.914499946002266, 3.7816442631908296), align=None, mode=Mode.SUBTRACT)
    boss_extrude9 = extrude(amount=-BOSS_EXTRUDE9_DEPTH)

    # Fillet5
    fillet5_edges = [part.edges().sort_by_distance(p)[0] for p in [
        (42.889499946002225, -8.890000000000002, 31.75),
        (23.839499946002224, -8.890000000000004, 31.75),
        (23.839499946002228, 7.62, 31.75),
        (42.889499946002225, 7.62, 31.75),
    ]]
    fillet(fillet5_edges, radius=FILLET5_R)

    # Mirror14: Boss-Extrude9 across plane
    add(boss_extrude9.mirror(Plane.XY.offset(-25.4)))

    # Fillet5 of Mirror14
    fillet5_of_mirror14_edges = [part.edges().sort_by_distance(p)[0] for p in [
        (42.889499946002225, -8.890000000000002, -82.55),
        (23.839499946002224, -8.890000000000004, -82.55),
        (23.839499946002228, 7.62, -82.55),
        (42.889499946002225, 7.62, -82.55),
    ]]
    fillet(fillet5_of_mirror14_edges, radius=FILLET5_OF_MIRROR14_R)

    # Sketch15 → Boss-Extrude10 (add)
    with BuildSketch(Plane.XZ.offset(-7.619999999999998)):
        with Locations((33.36417, -25.4)):
            Rectangle(SKETCH15_W, SKETCH15_H)
    extrude(amount=BOSS_EXTRUDE10_DEPTH)

    # Sketch16 → Cut-Extrude5 (cut)
    with BuildSketch(Plane(origin=(0, 0, -34.925), x_dir=(-1, 0, 0), z_dir=(0, 0, -1))):
        with Locations((-33.36449994600227, -1.22125e-12)):
            Circle(SKETCH16_R)
    extrude(amount=-CUT_EXTRUDE5_DEPTH, mode=Mode.SUBTRACT)

    # Sketch17 → Cut-Extrude6 (cut)
    with BuildSketch(Plane.ZY.offset(-19.843750000002416)):
        with Locations((-25.40000000000009, -20.692530593170666)):
            Circle(SKETCH17_R)
    extrude(amount=-CUT_EXTRUDE6_DEPTH, mode=Mode.SUBTRACT)

    # Chamfer2
    # the kernel refuses this chamfer: 10.16 mm, written as the material it adds along each edge
    with BuildSketch(Plane(origin=(46.88458999999757, 7.619999999999998, -34.925), x_dir=(0, 0.027495876610586355, -0.9996219169112968), z_dir=(-1, 0, 0))) as chamfer2_piece_1_section:
        Polygon((CHAMFER2_SIZE * 0.999621916911, CHAMFER2_SIZE * 0.0274958766106), (-CHAMFER2_SIZE * 0.0274958766106, CHAMFER2_SIZE * 0.999621916911), (0, 0), align=None)
    chamfer2_piece_1 = extrude(amount=27.040839999995157, mode=Mode.PRIVATE)
    chamfer2_piece_1 = chamfer2_piece_1 - Plane(origin=(33.36449994600227, -1.22125e-12, -43.5061832711177), x_dir=(-1, 0, 0), z_dir=(0, 0, -1)) * Cylinder(5.080000000000001, 95, mode=Mode.PRIVATE)
    add(chamfer2_piece_1)
    with BuildSketch(Plane(origin=(19.843750000002416, 7.619999999999998, -15.874999999999996), x_dir=(0, 0.027495876610586355, 0.9996219169112968), z_dir=(1, 0, 0))) as chamfer2_piece_2_section:
        Polygon((CHAMFER2_SIZE * 0.999621916911, CHAMFER2_SIZE * 0.0274958766106), (-CHAMFER2_SIZE * 0.0274958766106, CHAMFER2_SIZE * 0.999621916911), (0, 0), align=None)
    chamfer2_piece_2 = extrude(amount=27.040839999995157, mode=Mode.PRIVATE)
    chamfer2_piece_2 = chamfer2_piece_2 - Plane(origin=(33.36449994600227, -1.22125e-12, -7.2938167251443), x_dir=(-1, 0, 0), z_dir=(0, 0, -1)) * Cylinder(5.080000000000001, 95, mode=Mode.PRIVATE)
    add(chamfer2_piece_2)


solid = part.part
